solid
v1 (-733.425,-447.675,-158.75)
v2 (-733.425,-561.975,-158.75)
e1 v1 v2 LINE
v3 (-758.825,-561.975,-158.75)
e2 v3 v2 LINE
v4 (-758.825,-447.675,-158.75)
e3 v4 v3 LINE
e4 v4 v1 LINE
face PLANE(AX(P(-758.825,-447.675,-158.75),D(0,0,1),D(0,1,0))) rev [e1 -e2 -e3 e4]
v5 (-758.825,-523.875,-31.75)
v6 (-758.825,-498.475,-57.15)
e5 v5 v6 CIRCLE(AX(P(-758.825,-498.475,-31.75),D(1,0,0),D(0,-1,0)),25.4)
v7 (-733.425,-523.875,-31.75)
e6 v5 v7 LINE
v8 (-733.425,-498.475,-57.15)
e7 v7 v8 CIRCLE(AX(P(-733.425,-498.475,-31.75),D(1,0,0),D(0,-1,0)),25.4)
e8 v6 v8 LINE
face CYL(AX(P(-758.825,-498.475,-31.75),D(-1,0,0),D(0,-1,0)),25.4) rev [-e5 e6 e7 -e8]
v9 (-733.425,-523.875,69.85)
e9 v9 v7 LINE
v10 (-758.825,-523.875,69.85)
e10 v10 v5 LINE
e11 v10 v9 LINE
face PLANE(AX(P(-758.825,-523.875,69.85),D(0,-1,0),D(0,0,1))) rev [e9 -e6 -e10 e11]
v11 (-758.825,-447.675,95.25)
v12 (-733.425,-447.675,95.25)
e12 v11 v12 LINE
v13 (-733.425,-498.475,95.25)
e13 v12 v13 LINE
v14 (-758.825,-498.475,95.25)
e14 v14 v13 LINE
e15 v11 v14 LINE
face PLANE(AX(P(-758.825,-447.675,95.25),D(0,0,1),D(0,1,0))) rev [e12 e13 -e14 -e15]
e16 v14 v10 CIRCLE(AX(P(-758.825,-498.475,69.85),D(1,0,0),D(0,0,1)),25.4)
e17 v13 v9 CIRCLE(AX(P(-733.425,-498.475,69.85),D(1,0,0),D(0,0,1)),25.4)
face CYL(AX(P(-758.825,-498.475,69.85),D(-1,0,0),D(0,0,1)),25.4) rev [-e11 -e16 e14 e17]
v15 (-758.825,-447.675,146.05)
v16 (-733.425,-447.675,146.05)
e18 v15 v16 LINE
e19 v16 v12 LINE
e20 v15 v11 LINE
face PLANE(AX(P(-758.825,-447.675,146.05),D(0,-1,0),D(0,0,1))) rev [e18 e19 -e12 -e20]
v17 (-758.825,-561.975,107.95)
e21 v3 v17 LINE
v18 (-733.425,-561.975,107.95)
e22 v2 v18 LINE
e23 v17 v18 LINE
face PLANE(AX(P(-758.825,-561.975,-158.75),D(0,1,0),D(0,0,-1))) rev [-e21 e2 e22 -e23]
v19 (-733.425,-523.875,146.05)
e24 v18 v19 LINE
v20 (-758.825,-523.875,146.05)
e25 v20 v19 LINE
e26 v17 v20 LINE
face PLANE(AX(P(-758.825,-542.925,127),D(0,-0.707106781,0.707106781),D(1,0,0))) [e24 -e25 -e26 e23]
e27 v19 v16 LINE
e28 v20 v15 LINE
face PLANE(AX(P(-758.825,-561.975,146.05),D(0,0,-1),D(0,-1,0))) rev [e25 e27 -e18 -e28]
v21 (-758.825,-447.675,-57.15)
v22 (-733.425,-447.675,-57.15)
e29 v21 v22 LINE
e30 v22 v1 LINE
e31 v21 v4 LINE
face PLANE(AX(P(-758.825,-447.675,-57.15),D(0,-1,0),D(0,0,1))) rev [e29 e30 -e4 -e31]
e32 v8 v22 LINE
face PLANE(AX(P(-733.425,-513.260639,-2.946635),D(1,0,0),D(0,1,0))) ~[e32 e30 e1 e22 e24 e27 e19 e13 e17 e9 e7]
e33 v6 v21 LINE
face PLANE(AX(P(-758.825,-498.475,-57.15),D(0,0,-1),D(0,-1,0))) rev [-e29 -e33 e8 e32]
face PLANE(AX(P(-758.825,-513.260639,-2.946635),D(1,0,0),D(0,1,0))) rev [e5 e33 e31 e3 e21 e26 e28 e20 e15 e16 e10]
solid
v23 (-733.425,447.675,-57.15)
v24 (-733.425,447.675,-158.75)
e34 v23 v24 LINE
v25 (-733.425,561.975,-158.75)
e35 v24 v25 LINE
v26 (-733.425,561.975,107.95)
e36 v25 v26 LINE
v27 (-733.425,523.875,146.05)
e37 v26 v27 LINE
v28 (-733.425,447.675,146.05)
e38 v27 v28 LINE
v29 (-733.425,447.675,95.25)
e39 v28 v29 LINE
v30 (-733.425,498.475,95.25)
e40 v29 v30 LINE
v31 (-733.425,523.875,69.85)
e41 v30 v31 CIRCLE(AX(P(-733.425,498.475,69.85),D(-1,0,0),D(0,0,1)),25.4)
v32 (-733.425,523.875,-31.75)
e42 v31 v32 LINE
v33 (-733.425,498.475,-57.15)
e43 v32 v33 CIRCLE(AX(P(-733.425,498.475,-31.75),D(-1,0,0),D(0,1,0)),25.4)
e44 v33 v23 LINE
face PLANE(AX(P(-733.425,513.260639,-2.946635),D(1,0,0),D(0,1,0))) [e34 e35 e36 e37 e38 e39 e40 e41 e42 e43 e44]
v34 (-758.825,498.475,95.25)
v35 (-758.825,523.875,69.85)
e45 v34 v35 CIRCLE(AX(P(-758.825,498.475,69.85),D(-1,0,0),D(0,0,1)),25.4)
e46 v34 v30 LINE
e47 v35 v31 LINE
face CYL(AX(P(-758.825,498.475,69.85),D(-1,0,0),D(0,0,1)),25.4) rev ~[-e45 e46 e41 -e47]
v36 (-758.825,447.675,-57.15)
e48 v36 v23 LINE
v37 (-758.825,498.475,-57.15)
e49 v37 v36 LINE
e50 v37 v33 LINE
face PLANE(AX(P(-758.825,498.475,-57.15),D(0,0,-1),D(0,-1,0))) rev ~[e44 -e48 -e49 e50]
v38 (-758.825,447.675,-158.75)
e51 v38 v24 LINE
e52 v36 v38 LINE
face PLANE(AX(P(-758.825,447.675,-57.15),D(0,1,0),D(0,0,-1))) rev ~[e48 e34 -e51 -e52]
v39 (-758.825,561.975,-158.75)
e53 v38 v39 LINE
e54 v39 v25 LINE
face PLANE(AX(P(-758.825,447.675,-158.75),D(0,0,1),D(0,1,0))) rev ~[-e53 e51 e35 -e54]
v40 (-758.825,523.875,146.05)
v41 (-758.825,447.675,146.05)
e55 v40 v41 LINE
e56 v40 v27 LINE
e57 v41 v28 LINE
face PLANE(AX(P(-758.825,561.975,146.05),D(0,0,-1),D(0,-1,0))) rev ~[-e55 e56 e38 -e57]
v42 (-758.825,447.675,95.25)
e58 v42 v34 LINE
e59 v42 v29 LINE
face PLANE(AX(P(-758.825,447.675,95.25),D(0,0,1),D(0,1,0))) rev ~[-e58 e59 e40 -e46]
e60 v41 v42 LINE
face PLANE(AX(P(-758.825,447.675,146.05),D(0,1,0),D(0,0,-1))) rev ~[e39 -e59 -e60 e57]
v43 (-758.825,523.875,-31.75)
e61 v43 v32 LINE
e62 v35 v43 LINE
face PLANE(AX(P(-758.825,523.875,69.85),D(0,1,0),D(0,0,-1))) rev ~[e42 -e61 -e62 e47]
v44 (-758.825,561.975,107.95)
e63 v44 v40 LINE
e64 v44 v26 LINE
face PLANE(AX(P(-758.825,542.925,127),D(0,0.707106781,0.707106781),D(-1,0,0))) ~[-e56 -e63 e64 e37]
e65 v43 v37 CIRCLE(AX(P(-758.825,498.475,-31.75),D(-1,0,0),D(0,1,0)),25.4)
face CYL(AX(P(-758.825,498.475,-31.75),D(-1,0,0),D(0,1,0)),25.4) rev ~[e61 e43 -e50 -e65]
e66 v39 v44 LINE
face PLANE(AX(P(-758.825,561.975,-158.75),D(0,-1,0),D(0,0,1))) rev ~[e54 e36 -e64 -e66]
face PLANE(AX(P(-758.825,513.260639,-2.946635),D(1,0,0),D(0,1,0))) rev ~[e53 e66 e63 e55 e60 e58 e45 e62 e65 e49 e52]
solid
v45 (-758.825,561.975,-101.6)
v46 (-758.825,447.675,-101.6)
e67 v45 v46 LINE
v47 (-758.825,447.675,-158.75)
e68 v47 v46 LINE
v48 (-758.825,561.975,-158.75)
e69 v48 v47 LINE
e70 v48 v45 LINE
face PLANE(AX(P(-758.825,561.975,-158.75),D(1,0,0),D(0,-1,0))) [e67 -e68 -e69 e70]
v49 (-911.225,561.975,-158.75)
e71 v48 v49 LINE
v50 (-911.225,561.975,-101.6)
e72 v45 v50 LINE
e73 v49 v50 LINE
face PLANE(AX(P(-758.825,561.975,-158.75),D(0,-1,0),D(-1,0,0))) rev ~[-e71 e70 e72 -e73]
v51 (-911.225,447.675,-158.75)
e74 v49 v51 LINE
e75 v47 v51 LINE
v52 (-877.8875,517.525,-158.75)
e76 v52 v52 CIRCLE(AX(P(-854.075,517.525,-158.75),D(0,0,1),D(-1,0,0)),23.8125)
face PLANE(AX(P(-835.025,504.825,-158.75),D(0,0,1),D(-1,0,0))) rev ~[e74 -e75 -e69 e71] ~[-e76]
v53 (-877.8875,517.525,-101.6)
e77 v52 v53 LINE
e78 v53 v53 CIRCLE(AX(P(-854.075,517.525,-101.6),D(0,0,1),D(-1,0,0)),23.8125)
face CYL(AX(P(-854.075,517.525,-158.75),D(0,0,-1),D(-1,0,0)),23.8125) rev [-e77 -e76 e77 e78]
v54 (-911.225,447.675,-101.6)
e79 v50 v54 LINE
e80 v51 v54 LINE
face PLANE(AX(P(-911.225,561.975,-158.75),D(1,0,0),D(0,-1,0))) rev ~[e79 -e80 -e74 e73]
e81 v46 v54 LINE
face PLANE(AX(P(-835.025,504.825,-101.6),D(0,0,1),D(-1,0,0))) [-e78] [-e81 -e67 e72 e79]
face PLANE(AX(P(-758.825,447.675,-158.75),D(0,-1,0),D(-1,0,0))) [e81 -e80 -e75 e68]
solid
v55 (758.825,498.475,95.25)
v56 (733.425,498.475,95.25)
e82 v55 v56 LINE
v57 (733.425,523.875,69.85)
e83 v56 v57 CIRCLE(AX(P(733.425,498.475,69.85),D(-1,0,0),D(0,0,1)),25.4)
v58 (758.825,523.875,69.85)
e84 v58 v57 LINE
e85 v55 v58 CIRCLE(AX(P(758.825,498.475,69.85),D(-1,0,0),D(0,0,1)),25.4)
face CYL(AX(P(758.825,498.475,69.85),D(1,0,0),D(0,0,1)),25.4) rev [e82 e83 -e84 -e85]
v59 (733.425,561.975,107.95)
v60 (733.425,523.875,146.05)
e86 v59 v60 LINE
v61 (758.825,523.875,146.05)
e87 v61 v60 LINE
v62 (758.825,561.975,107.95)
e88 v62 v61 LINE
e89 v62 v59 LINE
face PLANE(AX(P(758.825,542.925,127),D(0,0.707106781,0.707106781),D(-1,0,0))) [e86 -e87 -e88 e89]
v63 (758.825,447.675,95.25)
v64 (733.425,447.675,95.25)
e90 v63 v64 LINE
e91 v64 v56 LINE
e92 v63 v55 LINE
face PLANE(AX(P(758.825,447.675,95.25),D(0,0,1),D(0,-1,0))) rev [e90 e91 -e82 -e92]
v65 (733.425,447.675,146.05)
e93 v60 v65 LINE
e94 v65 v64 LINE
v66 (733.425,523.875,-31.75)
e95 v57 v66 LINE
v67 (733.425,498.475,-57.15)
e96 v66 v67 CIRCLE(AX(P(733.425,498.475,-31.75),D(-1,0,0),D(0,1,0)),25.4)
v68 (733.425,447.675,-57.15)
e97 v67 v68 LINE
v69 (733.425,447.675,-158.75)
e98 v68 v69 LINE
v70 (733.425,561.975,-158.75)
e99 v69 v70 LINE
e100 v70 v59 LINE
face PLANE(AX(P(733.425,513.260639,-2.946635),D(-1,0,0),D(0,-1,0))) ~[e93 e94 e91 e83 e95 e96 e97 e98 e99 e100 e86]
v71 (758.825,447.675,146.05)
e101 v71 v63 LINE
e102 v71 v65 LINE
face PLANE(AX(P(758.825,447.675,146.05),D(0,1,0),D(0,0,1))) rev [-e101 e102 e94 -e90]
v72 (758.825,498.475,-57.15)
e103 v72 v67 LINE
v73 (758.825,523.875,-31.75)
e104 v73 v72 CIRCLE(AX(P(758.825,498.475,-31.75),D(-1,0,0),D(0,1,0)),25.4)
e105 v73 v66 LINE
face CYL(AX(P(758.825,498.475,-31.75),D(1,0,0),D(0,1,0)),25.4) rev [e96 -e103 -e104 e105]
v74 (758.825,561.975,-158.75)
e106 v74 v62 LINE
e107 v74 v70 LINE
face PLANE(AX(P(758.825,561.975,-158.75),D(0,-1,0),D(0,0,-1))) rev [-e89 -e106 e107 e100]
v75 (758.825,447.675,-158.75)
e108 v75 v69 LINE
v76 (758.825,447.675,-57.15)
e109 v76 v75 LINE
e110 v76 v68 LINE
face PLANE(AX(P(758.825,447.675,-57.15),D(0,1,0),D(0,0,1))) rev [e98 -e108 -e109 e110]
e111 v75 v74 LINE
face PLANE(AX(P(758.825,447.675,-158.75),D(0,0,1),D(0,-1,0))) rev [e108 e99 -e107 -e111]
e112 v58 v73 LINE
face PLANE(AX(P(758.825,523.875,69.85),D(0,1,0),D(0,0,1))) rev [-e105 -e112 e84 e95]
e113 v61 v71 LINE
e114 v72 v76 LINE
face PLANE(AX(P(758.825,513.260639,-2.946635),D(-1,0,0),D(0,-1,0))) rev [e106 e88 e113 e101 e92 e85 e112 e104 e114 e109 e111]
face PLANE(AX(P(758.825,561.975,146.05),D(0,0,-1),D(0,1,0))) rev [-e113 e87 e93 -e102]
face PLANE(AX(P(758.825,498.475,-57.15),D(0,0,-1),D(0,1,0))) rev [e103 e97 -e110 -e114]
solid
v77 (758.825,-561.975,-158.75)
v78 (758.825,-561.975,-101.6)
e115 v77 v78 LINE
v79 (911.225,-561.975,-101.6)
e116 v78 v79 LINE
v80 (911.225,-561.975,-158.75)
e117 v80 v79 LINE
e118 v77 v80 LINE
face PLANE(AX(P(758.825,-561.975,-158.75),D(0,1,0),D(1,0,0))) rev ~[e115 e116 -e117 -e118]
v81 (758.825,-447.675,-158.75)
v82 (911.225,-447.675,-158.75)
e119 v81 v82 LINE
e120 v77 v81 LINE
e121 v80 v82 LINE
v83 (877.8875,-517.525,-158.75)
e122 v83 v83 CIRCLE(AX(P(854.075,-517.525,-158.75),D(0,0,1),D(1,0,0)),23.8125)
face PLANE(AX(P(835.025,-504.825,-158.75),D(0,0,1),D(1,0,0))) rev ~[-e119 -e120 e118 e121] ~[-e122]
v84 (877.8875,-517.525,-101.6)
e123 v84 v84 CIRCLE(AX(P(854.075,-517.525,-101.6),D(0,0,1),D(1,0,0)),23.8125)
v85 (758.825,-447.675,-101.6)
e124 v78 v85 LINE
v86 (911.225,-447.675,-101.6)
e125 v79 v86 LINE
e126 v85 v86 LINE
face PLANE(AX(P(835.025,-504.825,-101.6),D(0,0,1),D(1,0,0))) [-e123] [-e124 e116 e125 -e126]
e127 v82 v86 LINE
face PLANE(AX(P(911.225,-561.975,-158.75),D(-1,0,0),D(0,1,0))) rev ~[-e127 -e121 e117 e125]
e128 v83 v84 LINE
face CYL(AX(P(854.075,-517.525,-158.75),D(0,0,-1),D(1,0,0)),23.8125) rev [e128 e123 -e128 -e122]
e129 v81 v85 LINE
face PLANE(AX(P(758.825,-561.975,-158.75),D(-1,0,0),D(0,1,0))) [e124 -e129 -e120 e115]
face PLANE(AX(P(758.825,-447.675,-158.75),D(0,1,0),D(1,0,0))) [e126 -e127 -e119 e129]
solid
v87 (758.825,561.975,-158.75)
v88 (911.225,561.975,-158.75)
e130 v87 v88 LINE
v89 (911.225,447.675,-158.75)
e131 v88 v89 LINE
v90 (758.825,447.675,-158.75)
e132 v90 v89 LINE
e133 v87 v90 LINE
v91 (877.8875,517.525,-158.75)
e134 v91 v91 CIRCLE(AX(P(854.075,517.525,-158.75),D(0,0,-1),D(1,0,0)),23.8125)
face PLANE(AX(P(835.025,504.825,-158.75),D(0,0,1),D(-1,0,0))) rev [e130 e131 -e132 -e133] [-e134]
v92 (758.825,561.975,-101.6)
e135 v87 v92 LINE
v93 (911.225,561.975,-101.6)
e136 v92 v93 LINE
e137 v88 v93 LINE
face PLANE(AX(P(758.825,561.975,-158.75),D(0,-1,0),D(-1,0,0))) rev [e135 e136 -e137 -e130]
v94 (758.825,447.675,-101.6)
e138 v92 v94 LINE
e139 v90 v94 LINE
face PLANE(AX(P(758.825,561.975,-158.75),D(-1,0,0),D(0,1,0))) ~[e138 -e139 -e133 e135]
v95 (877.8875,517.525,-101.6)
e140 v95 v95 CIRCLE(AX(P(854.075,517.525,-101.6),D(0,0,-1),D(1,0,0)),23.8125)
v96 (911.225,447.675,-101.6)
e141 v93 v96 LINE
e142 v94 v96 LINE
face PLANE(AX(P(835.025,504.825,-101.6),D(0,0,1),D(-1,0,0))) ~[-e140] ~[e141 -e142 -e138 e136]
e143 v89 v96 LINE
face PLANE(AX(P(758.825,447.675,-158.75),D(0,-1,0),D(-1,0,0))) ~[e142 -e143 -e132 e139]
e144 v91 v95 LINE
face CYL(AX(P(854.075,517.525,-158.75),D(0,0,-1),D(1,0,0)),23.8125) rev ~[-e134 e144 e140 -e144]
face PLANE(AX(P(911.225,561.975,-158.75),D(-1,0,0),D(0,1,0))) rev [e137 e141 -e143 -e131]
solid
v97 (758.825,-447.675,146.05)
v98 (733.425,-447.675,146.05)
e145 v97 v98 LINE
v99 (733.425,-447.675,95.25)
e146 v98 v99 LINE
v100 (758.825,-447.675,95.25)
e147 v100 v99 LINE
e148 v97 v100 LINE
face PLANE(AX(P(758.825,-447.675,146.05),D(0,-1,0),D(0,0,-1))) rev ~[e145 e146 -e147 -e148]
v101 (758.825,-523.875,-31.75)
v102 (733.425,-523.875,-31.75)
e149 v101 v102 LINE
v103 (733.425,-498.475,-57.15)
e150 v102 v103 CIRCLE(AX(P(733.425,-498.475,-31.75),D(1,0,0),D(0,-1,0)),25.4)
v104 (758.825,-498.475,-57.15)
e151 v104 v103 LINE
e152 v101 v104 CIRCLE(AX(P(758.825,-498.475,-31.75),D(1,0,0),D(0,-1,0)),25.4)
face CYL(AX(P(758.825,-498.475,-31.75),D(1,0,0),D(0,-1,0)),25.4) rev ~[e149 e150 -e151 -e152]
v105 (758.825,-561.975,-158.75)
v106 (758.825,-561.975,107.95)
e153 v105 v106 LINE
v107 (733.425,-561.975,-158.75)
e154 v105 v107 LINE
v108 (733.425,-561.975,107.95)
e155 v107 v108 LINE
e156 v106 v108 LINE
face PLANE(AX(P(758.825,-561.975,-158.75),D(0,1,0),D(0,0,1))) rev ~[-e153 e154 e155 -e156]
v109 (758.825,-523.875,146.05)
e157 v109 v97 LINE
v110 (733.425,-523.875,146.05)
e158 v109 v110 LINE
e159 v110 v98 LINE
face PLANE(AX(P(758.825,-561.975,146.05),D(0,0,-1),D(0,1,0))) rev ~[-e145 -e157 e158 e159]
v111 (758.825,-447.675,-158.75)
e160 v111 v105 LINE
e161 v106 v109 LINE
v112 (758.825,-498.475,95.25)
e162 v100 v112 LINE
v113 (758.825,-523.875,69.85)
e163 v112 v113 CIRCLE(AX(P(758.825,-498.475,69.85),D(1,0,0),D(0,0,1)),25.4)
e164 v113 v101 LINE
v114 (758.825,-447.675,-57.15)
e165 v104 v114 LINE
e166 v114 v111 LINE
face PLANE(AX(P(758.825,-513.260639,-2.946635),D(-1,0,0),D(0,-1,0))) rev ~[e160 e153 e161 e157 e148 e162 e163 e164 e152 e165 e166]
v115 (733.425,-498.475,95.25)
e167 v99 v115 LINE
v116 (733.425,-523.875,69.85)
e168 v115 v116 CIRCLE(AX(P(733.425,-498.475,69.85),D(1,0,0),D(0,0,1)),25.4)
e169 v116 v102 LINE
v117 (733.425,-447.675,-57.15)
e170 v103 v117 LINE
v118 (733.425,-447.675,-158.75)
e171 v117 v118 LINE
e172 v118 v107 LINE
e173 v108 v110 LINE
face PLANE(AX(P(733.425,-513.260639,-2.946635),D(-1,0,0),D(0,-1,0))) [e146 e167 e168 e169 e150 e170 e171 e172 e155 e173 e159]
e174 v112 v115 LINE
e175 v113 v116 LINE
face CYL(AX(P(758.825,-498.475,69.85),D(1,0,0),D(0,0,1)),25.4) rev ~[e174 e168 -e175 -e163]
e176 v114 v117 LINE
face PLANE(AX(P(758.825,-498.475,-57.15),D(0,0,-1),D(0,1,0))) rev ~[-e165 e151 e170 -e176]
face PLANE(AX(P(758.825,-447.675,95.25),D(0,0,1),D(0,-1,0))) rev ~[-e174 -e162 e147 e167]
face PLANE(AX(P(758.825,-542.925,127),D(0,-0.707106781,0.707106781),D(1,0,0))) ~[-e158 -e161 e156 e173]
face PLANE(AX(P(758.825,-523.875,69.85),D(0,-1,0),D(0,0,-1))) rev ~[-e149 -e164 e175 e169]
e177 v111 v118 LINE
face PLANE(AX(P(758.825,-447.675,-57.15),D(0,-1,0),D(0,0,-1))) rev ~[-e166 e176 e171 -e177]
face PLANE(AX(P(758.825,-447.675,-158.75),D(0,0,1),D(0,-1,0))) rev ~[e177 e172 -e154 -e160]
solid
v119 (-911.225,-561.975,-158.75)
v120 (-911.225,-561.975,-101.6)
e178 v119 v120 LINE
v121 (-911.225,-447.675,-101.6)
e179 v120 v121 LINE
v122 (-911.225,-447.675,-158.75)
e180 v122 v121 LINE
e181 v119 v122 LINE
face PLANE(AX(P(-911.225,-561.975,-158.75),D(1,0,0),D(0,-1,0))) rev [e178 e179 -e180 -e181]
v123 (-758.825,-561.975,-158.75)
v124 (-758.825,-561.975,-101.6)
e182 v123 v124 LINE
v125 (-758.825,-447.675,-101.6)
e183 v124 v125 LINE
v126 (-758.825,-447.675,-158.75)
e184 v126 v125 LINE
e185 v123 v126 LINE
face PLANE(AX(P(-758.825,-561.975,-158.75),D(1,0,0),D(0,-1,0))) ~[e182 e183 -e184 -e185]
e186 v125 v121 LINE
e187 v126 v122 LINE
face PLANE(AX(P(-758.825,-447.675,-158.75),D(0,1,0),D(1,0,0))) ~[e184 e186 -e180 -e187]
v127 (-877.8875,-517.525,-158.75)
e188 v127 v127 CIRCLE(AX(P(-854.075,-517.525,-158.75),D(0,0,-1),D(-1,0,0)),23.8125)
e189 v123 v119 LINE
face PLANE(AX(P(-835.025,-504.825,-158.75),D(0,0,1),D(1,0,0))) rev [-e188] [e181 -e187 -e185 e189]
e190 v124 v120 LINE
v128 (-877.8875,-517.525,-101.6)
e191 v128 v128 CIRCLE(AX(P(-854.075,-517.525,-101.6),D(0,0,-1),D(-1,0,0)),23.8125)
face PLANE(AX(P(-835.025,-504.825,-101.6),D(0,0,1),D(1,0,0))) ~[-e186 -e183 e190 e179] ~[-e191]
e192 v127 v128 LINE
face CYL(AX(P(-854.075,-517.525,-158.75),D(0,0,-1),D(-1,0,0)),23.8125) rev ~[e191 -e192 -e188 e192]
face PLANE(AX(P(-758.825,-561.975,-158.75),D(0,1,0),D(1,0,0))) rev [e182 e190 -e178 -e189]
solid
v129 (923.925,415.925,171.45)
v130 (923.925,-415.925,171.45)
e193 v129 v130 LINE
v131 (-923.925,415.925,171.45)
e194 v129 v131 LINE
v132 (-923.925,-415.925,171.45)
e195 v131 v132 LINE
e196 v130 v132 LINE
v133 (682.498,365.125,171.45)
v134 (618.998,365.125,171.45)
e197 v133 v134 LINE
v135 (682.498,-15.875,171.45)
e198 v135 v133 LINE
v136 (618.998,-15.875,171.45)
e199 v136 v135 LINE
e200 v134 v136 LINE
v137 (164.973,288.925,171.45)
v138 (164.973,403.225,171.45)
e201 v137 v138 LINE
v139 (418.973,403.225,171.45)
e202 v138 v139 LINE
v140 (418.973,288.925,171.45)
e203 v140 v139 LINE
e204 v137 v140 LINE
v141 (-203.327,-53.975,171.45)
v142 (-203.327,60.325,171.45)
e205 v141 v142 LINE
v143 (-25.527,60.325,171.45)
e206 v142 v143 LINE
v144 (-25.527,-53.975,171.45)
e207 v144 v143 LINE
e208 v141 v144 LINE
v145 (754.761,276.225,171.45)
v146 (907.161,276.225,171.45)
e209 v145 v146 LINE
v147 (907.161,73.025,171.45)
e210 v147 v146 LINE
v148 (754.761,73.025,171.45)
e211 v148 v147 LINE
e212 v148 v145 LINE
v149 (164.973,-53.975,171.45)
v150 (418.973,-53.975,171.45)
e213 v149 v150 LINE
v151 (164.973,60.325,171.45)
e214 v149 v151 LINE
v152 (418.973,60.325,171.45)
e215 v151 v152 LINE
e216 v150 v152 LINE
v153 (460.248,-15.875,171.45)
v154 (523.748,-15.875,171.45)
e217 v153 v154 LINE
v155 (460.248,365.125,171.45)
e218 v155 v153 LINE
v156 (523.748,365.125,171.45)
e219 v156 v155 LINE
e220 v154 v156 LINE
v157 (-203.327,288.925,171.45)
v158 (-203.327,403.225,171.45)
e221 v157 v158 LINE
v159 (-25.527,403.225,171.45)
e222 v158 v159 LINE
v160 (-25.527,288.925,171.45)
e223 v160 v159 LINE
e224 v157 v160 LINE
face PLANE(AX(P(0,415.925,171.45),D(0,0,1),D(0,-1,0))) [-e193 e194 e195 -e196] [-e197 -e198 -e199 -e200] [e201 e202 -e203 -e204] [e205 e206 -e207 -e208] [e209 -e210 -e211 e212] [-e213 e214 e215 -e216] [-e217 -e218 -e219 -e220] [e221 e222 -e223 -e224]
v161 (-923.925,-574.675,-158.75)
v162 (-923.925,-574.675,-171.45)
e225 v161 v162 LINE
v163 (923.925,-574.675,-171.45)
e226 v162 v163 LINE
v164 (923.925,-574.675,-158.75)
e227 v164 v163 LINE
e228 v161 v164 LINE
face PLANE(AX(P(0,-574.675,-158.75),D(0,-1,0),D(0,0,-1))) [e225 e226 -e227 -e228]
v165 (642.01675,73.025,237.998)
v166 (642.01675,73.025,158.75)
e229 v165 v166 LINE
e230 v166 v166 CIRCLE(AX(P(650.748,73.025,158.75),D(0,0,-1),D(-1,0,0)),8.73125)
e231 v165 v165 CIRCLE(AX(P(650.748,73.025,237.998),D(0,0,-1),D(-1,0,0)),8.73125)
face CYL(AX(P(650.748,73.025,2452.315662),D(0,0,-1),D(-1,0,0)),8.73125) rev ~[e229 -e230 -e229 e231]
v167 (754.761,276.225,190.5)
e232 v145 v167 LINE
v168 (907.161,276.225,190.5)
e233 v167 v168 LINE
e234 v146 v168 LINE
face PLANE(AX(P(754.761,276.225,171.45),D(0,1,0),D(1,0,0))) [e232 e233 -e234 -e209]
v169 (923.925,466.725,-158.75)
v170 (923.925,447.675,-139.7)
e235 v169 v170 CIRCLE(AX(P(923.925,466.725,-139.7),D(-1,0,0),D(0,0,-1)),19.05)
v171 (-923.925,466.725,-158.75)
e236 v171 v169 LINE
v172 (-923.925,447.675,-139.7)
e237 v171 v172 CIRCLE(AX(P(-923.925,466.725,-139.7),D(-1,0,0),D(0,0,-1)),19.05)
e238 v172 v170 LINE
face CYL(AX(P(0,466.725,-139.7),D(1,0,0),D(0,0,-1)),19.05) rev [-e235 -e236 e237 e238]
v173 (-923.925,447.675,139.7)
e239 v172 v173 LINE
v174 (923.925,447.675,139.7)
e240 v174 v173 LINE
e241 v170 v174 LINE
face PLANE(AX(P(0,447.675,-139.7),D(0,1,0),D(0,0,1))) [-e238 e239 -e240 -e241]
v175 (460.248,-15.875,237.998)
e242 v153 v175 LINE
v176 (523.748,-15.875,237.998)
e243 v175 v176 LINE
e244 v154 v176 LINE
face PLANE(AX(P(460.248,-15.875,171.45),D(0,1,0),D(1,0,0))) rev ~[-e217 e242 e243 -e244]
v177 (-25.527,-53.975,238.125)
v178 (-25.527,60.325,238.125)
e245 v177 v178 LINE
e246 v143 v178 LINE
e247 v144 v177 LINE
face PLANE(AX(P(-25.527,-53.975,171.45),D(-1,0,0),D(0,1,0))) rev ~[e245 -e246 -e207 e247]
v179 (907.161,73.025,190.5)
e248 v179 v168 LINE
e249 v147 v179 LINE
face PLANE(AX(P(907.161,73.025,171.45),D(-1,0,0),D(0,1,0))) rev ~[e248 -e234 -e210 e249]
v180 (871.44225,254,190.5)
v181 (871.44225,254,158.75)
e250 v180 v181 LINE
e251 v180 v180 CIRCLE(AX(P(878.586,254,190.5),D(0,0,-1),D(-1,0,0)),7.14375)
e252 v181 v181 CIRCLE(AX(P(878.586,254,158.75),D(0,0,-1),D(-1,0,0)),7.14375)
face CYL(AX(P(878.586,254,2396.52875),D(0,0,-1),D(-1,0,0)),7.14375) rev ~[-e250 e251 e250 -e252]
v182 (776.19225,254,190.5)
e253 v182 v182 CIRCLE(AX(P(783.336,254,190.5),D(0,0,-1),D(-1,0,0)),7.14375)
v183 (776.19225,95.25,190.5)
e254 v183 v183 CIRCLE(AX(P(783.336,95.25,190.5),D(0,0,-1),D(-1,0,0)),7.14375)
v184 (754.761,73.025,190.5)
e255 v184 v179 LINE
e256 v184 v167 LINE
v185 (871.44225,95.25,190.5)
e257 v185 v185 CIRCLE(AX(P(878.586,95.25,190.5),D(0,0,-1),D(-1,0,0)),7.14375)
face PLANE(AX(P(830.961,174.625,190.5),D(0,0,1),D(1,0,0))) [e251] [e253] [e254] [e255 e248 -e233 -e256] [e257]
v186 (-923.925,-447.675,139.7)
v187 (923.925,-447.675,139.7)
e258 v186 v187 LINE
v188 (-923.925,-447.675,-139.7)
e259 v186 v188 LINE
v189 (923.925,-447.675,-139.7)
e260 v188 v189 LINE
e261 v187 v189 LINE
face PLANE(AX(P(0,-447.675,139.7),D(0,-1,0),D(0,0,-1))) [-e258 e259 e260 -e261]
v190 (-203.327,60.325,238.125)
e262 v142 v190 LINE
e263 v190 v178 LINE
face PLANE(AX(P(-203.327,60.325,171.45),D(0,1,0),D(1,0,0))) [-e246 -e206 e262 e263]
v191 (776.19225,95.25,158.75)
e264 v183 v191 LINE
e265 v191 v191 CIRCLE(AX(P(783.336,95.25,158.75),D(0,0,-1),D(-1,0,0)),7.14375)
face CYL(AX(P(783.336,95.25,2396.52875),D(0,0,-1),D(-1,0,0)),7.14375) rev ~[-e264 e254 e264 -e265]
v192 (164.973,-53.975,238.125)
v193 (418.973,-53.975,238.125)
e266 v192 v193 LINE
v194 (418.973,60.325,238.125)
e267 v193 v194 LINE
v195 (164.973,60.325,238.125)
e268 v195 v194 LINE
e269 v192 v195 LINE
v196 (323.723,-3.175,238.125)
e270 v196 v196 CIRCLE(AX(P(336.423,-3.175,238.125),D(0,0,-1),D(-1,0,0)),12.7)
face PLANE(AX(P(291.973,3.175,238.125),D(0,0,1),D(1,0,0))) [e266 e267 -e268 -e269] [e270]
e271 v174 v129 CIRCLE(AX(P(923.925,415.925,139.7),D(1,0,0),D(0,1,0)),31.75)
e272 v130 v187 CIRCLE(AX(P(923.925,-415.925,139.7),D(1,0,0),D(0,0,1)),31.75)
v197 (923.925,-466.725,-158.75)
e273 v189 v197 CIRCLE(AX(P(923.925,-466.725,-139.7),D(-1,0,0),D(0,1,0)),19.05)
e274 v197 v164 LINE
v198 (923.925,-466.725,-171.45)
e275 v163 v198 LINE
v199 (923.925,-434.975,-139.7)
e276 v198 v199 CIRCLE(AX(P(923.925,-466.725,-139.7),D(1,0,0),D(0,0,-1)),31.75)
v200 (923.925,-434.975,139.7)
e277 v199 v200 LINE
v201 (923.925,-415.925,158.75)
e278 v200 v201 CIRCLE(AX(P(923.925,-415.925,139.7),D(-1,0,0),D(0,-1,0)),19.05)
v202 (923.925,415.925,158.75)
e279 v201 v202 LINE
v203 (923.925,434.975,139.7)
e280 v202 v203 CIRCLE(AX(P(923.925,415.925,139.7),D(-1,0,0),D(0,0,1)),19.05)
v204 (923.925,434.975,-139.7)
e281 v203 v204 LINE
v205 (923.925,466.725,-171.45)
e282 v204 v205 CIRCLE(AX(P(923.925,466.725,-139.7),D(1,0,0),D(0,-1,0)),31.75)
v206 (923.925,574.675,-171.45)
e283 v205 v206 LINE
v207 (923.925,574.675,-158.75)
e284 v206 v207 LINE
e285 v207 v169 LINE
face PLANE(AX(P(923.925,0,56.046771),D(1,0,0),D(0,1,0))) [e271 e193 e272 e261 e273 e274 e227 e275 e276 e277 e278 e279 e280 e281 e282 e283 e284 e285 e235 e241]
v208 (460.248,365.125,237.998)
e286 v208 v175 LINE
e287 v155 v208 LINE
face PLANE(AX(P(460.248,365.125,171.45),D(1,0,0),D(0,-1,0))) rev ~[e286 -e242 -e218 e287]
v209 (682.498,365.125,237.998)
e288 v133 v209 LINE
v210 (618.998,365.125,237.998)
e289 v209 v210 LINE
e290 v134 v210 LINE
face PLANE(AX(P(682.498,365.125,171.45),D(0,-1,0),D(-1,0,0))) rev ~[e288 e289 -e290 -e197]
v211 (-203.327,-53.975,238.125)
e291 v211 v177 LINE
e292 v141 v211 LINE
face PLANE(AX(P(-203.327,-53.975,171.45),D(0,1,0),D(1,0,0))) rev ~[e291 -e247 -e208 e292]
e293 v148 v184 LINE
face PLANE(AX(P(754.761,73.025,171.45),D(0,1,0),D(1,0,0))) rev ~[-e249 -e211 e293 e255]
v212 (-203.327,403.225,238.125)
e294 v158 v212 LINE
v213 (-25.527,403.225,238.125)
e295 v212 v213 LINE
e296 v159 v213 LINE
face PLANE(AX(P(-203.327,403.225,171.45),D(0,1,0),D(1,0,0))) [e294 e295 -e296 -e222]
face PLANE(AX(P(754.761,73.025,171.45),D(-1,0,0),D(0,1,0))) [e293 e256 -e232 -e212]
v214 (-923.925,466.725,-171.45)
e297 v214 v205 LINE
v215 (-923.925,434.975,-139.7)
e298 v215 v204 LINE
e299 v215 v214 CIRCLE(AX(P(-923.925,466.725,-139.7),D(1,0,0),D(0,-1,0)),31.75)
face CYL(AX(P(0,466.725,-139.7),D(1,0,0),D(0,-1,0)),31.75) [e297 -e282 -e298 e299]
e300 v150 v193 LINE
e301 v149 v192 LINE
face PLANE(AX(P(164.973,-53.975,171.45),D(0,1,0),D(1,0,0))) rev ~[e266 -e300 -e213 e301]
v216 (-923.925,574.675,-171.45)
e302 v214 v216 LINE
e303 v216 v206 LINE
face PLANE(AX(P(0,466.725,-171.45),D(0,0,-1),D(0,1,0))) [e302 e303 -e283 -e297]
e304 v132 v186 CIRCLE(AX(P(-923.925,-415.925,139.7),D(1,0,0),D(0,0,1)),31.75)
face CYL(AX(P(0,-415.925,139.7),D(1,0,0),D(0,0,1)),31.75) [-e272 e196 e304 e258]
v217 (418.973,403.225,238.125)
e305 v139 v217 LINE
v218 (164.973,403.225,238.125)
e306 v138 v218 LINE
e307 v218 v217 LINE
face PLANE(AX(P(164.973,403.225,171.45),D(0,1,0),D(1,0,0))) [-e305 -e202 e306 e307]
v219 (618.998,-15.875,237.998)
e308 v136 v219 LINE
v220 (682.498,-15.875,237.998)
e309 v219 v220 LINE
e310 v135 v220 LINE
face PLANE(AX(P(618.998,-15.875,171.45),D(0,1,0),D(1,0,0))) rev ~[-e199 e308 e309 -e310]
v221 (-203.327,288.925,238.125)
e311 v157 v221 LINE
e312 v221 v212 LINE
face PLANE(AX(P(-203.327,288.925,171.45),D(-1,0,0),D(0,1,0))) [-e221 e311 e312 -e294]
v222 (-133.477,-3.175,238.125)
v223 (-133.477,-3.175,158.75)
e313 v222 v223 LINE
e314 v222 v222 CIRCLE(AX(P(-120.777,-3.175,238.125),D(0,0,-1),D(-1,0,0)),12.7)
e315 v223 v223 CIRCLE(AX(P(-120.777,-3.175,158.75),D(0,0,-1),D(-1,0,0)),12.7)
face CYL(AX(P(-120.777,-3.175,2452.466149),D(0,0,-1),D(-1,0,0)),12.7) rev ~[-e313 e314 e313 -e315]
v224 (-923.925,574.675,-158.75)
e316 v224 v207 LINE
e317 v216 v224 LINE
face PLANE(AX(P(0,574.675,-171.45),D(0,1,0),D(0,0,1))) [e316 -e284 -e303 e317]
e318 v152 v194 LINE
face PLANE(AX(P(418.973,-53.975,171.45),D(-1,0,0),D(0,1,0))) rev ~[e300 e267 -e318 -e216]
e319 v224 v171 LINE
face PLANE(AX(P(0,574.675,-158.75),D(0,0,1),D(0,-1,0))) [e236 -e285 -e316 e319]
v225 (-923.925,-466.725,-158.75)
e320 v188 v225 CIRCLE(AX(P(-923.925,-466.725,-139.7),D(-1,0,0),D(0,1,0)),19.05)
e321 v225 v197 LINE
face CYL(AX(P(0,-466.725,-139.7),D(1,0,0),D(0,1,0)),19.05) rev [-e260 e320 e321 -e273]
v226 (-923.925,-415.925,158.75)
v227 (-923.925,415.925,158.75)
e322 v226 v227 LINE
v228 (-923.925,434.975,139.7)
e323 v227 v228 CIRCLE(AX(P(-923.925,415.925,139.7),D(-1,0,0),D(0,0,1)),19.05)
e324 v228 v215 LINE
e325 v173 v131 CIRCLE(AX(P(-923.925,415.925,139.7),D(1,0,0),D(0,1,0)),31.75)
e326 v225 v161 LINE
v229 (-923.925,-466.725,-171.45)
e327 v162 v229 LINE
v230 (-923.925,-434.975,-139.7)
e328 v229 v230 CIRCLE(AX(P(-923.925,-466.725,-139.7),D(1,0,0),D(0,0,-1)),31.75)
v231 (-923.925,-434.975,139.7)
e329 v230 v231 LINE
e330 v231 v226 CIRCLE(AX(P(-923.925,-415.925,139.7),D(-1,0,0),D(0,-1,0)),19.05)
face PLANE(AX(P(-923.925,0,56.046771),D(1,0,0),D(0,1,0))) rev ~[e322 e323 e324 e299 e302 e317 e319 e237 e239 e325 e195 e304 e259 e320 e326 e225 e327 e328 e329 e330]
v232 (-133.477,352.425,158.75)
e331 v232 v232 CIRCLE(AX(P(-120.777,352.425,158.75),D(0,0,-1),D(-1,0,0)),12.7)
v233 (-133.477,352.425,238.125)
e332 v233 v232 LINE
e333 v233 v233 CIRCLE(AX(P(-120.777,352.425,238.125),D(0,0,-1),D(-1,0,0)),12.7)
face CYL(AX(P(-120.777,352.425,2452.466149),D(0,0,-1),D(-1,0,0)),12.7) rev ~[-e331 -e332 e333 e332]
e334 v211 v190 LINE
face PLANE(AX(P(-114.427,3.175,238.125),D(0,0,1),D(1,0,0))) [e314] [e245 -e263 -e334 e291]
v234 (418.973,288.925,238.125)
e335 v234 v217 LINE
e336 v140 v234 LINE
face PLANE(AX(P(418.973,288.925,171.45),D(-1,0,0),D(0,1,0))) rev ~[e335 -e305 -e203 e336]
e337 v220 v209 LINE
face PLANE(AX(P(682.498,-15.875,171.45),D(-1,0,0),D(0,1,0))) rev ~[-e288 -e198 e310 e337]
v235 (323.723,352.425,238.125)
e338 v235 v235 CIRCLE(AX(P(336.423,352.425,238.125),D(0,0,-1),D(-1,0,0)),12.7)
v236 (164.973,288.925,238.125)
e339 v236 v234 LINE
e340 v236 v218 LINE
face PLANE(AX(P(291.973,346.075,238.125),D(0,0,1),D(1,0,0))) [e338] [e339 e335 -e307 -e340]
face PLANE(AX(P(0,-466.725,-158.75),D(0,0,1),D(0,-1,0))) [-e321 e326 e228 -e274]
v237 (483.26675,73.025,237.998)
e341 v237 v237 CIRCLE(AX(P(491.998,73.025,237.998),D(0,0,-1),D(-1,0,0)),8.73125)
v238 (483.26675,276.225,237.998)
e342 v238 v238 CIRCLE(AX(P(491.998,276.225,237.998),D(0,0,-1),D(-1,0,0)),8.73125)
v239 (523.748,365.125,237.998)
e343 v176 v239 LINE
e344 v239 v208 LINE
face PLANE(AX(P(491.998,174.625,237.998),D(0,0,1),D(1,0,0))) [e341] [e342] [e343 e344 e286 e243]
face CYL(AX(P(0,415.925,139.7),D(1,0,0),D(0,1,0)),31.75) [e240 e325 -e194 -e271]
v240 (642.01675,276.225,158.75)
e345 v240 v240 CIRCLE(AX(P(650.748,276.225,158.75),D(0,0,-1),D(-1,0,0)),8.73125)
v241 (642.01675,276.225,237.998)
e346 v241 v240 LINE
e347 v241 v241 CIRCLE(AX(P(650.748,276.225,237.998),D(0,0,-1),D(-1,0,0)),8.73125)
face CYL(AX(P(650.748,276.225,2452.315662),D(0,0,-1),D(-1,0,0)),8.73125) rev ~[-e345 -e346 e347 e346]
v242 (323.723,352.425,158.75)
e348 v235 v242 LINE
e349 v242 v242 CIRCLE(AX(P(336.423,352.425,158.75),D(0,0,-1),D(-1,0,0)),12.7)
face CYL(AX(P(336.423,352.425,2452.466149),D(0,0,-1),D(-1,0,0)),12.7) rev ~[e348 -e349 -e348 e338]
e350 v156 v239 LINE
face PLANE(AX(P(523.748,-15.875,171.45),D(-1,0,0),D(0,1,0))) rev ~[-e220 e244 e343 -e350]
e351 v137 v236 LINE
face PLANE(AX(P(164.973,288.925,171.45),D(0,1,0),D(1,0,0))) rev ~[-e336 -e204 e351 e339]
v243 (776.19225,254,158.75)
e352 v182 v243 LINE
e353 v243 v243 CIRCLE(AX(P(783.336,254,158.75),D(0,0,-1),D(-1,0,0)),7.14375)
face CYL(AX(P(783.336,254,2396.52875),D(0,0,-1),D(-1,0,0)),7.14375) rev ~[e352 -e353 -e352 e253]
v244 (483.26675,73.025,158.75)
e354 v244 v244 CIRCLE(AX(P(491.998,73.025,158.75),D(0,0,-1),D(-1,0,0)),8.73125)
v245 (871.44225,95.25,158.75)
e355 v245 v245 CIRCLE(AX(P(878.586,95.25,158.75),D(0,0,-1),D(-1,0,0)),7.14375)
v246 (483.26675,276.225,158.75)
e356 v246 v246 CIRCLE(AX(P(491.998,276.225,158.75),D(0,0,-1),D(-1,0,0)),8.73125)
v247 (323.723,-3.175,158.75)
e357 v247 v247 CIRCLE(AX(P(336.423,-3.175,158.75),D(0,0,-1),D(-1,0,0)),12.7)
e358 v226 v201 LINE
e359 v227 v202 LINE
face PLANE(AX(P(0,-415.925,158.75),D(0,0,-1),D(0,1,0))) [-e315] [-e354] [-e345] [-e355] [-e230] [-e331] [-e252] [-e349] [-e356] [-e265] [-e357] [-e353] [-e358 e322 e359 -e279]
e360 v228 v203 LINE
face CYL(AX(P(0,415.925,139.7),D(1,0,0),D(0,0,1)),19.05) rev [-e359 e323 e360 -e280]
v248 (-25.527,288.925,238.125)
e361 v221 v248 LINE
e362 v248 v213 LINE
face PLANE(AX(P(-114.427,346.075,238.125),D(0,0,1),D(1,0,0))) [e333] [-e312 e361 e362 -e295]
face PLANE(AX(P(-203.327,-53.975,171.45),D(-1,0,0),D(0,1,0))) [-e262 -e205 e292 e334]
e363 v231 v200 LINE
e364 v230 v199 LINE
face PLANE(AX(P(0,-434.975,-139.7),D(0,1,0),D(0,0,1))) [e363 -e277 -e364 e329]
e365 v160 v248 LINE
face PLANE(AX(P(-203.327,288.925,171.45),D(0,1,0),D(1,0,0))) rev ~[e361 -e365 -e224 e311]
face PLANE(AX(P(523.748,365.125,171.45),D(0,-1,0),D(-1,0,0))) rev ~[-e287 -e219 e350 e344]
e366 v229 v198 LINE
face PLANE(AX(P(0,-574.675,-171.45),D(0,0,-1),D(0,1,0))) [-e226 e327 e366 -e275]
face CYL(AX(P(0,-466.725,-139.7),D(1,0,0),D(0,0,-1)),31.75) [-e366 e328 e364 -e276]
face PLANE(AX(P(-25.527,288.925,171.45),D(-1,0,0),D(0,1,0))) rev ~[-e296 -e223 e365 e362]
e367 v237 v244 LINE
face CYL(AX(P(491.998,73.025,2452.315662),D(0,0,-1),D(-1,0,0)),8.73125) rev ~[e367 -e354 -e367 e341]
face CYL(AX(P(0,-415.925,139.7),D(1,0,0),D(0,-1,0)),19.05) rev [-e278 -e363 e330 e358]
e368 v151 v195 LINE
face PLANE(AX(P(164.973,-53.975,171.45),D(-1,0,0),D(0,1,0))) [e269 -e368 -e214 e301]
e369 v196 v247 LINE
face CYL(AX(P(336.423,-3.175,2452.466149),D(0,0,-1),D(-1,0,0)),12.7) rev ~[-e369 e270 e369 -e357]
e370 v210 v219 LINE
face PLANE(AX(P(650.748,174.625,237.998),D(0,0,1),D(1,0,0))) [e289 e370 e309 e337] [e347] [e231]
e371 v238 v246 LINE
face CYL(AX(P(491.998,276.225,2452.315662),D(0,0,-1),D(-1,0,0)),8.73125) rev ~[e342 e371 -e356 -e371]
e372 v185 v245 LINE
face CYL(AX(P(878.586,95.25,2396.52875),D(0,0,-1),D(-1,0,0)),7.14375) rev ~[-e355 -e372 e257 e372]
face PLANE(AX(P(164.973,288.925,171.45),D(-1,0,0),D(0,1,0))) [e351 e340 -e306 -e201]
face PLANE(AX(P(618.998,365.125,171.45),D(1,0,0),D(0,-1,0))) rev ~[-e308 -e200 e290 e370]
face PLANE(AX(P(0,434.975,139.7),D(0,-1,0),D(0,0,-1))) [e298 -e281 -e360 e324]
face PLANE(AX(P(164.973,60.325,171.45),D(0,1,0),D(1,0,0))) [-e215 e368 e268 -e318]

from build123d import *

# Parameters (mm, degrees)
F1_DEPTH  = 923.925
F2_W      = 152.4
F2_H      = 114.3
F2_R      = 23.8125
F3_DEPTH  = 57.15
F5_DEPTH  = 25.4
F6_SIZE   = 38.1
F9_W      = 152.4
F9_H      = 203.2
F10_DEPTH = 19.05
F12_D     = 14.2875
F14_DEPTH = 66.548
F16_D     = 17.4625
F17_W     = 177.8
F17_H     = 114.3
F17_W_2   = 254
F18_DEPTH = 66.675
F20_D     = 25.4


# Not quite as in the source:
# - a length typed as a fraction of an inch, garbled in the dataset ("3 / 203.2 mm" for 3/8 in), is restored


with BuildPart() as f1:
    # F0 (on Right) → F1 (new body, symmetric)
    with BuildSketch(Plane.YZ):
        with BuildLine():
            Line((0, 171.45), (-415.925, 171.45))
            ThreePointArc((-415.925, 171.45), (-438.3756403027, 162.1506403027), (-447.675, 139.7))
            Line((-447.675, 139.7), (-447.675, -139.7))
            ThreePointArc((-447.675, -139.7), (-453.2546158184, -153.1703841816), (-466.725, -158.75))
            Line((-466.725, -158.75), (-574.675, -158.75))
            Line((-574.675, -158.75), (-574.675, -171.45))
            Line((-574.675, -171.45), (-466.725, -171.45))
            ThreePointArc((-466.725, -171.45), (-444.2743596973, -162.1506403027), (-434.975, -139.7))
            Line((-434.975, -139.7), (-434.975, 139.7))
            ThreePointArc((-434.975, 139.7), (-429.3953841816, 153.1703841816), (-415.925, 158.75))
            Line((-415.925, 158.75), (0, 158.75))
            Line((0, 158.75), (415.925, 158.75))
            ThreePointArc((415.925, 158.75), (429.3953841816, 153.1703841816), (434.975, 139.7))
            Line((434.975, 139.7), (434.975, -139.7))
            ThreePointArc((434.975, -139.7), (444.2743596973, -162.1506403027), (466.725, -171.45))
            Line((466.725, -171.45), (574.675, -171.45))
            Line((574.675, -171.45), (574.675, -158.75))
            Line((574.675, -158.75), (466.725, -158.75))
            ThreePointArc((466.725, -158.75), (453.2546158184, -153.1703841816), (447.675, -139.7))
            Line((447.675, -139.7), (447.675, 139.7))
            ThreePointArc((447.675, 139.7), (438.3756403027, 162.1506403027), (415.925, 171.45))
            Line((415.925, 171.45), (0, 171.45))
        make_face()
    extrude(amount=F1_DEPTH, both=True)

    # F9 (on face) → F10 (join)
    with BuildSketch(Plane.XY.offset(171.45)):
        with Locations((830.961, 174.625)):
            Rectangle(F9_W, F9_H)
    extrude(amount=F10_DEPTH)

    # F12 (through all)
    with Locations(Plane.XY.offset(190.5)):
        with Locations((783.336, 254), (878.586, 254), (783.336, 95.25), (878.586, 95.25)):
            Hole(F12_D / 2)

    # F13 (on face) → F14 (join)
    with BuildSketch(Plane.XY.offset(171.45)):
        Polygon((523.748, 174.625), (523.748, 365.125), (460.248, 365.125), (460.248, 174.625), (460.248, -15.875), (523.748, -15.875), align=None)
        Polygon((682.498, 365.125), (618.998, 365.125), (618.998, 174.625), (618.998, -15.875), (682.498, -15.875), (682.498, 174.625), align=None)
    extrude(amount=F14_DEPTH)

    # F16 (through all)
    with Locations(Plane.XY.offset(237.998)):
        with Locations((491.998, 276.225), (650.748, 276.225), (491.998, 73.025), (650.748, 73.025)):
            Hole(F16_D / 2)

    # F17 (on face) → F18 (join)
    with BuildSketch(Plane.XY.offset(171.45)):
        with Locations((-114.427, 3.175)):
            Rectangle(F17_W, F17_H)
        with Locations((-114.427, 346.075)):
            Rectangle(F17_W, F17_H)
        with Locations((291.973, 346.075)):
            Rectangle(F17_W_2, F17_H)
        with Locations((291.973, 3.175)):
            Rectangle(F17_W_2, F17_H)
    extrude(amount=F18_DEPTH)

    # F20 (through all)
    with Locations(Plane.XY.offset(238.125)):
        with Locations((-120.777, 352.425), (336.423, 352.425), (-120.777, -3.175), (336.423, -3.175)):
            Hole(F20_D / 2)


with BuildPart() as f3:
    # F2 (on face) → F3 (new body)
    with BuildSketch(Plane.XY.offset(-158.75)):
        with Locations((835.025, -504.825)):
            Rectangle(F2_W, F2_H)
        with Locations((854.075, -517.525)):
            Circle(F2_R, mode=Mode.SUBTRACT)
    extrude(amount=F3_DEPTH)


with BuildPart() as f5:
    # F4 (on face) → F5 (new body)
    with BuildSketch(Plane(origin=(758.825, 0, 0), x_dir=(0, -1, 0), z_dir=(-1, 0, 0))):
        with BuildLine():
            Line((447.675, -57.15), (447.675, -158.75))
            Line((447.675, -158.75), (561.975, -158.75))
            Line((561.975, -158.75), (561.975, 146.05))
            Line((561.975, 146.05), (447.675, 146.05))
            Line((447.675, 146.05), (447.675, 95.25))
            Line((447.675, 95.25), (498.475, 95.25))
            ThreePointArc((498.475, 95.25), (516.4355122421, 87.8105122421), (523.875, 69.85))
            Line((523.875, 69.85), (523.875, -31.75))
            ThreePointArc((523.875, -31.75), (516.4355122421, -49.7105122421), (498.475, -57.15))
            Line((498.475, -57.15), (447.675, -57.15))
        make_face()
    extrude(amount=F5_DEPTH)

    # F6
    f6_edges = [f5.edges().sort_by_distance(p)[0] for p in [
        (746.125, -561.975, 146.05),
    ]]
    chamfer(f6_edges, length=F6_SIZE)


with BuildPart() as f7_1:
    # F7: instance of F5
    add(f5.part.mirror(Plane.YZ))


with BuildPart() as f7_2:
    # F7: instance of F3
    add(f3.part.mirror(Plane.YZ))


with BuildPart() as f8_1:
    # F8: instance of F3
    add(f3.part.mirror(Plane.XZ))


with BuildPart() as f8_2:
    # F8: instance of F5
    add(f5.part.mirror(Plane.XZ))


with BuildPart() as f8_3:
    # F8: instance of F7_2
    add(f7_2.part.mirror(Plane.XZ))


with BuildPart() as f8_4:
    # F8: instance of F7_1
    add(f7_1.part.mirror(Plane.XZ))


solid = Compound([f1.part, f3.part, f5.part, f7_1.part, f7_2.part, f8_1.part, f8_2.part, f8_3.part, f8_4.part])
